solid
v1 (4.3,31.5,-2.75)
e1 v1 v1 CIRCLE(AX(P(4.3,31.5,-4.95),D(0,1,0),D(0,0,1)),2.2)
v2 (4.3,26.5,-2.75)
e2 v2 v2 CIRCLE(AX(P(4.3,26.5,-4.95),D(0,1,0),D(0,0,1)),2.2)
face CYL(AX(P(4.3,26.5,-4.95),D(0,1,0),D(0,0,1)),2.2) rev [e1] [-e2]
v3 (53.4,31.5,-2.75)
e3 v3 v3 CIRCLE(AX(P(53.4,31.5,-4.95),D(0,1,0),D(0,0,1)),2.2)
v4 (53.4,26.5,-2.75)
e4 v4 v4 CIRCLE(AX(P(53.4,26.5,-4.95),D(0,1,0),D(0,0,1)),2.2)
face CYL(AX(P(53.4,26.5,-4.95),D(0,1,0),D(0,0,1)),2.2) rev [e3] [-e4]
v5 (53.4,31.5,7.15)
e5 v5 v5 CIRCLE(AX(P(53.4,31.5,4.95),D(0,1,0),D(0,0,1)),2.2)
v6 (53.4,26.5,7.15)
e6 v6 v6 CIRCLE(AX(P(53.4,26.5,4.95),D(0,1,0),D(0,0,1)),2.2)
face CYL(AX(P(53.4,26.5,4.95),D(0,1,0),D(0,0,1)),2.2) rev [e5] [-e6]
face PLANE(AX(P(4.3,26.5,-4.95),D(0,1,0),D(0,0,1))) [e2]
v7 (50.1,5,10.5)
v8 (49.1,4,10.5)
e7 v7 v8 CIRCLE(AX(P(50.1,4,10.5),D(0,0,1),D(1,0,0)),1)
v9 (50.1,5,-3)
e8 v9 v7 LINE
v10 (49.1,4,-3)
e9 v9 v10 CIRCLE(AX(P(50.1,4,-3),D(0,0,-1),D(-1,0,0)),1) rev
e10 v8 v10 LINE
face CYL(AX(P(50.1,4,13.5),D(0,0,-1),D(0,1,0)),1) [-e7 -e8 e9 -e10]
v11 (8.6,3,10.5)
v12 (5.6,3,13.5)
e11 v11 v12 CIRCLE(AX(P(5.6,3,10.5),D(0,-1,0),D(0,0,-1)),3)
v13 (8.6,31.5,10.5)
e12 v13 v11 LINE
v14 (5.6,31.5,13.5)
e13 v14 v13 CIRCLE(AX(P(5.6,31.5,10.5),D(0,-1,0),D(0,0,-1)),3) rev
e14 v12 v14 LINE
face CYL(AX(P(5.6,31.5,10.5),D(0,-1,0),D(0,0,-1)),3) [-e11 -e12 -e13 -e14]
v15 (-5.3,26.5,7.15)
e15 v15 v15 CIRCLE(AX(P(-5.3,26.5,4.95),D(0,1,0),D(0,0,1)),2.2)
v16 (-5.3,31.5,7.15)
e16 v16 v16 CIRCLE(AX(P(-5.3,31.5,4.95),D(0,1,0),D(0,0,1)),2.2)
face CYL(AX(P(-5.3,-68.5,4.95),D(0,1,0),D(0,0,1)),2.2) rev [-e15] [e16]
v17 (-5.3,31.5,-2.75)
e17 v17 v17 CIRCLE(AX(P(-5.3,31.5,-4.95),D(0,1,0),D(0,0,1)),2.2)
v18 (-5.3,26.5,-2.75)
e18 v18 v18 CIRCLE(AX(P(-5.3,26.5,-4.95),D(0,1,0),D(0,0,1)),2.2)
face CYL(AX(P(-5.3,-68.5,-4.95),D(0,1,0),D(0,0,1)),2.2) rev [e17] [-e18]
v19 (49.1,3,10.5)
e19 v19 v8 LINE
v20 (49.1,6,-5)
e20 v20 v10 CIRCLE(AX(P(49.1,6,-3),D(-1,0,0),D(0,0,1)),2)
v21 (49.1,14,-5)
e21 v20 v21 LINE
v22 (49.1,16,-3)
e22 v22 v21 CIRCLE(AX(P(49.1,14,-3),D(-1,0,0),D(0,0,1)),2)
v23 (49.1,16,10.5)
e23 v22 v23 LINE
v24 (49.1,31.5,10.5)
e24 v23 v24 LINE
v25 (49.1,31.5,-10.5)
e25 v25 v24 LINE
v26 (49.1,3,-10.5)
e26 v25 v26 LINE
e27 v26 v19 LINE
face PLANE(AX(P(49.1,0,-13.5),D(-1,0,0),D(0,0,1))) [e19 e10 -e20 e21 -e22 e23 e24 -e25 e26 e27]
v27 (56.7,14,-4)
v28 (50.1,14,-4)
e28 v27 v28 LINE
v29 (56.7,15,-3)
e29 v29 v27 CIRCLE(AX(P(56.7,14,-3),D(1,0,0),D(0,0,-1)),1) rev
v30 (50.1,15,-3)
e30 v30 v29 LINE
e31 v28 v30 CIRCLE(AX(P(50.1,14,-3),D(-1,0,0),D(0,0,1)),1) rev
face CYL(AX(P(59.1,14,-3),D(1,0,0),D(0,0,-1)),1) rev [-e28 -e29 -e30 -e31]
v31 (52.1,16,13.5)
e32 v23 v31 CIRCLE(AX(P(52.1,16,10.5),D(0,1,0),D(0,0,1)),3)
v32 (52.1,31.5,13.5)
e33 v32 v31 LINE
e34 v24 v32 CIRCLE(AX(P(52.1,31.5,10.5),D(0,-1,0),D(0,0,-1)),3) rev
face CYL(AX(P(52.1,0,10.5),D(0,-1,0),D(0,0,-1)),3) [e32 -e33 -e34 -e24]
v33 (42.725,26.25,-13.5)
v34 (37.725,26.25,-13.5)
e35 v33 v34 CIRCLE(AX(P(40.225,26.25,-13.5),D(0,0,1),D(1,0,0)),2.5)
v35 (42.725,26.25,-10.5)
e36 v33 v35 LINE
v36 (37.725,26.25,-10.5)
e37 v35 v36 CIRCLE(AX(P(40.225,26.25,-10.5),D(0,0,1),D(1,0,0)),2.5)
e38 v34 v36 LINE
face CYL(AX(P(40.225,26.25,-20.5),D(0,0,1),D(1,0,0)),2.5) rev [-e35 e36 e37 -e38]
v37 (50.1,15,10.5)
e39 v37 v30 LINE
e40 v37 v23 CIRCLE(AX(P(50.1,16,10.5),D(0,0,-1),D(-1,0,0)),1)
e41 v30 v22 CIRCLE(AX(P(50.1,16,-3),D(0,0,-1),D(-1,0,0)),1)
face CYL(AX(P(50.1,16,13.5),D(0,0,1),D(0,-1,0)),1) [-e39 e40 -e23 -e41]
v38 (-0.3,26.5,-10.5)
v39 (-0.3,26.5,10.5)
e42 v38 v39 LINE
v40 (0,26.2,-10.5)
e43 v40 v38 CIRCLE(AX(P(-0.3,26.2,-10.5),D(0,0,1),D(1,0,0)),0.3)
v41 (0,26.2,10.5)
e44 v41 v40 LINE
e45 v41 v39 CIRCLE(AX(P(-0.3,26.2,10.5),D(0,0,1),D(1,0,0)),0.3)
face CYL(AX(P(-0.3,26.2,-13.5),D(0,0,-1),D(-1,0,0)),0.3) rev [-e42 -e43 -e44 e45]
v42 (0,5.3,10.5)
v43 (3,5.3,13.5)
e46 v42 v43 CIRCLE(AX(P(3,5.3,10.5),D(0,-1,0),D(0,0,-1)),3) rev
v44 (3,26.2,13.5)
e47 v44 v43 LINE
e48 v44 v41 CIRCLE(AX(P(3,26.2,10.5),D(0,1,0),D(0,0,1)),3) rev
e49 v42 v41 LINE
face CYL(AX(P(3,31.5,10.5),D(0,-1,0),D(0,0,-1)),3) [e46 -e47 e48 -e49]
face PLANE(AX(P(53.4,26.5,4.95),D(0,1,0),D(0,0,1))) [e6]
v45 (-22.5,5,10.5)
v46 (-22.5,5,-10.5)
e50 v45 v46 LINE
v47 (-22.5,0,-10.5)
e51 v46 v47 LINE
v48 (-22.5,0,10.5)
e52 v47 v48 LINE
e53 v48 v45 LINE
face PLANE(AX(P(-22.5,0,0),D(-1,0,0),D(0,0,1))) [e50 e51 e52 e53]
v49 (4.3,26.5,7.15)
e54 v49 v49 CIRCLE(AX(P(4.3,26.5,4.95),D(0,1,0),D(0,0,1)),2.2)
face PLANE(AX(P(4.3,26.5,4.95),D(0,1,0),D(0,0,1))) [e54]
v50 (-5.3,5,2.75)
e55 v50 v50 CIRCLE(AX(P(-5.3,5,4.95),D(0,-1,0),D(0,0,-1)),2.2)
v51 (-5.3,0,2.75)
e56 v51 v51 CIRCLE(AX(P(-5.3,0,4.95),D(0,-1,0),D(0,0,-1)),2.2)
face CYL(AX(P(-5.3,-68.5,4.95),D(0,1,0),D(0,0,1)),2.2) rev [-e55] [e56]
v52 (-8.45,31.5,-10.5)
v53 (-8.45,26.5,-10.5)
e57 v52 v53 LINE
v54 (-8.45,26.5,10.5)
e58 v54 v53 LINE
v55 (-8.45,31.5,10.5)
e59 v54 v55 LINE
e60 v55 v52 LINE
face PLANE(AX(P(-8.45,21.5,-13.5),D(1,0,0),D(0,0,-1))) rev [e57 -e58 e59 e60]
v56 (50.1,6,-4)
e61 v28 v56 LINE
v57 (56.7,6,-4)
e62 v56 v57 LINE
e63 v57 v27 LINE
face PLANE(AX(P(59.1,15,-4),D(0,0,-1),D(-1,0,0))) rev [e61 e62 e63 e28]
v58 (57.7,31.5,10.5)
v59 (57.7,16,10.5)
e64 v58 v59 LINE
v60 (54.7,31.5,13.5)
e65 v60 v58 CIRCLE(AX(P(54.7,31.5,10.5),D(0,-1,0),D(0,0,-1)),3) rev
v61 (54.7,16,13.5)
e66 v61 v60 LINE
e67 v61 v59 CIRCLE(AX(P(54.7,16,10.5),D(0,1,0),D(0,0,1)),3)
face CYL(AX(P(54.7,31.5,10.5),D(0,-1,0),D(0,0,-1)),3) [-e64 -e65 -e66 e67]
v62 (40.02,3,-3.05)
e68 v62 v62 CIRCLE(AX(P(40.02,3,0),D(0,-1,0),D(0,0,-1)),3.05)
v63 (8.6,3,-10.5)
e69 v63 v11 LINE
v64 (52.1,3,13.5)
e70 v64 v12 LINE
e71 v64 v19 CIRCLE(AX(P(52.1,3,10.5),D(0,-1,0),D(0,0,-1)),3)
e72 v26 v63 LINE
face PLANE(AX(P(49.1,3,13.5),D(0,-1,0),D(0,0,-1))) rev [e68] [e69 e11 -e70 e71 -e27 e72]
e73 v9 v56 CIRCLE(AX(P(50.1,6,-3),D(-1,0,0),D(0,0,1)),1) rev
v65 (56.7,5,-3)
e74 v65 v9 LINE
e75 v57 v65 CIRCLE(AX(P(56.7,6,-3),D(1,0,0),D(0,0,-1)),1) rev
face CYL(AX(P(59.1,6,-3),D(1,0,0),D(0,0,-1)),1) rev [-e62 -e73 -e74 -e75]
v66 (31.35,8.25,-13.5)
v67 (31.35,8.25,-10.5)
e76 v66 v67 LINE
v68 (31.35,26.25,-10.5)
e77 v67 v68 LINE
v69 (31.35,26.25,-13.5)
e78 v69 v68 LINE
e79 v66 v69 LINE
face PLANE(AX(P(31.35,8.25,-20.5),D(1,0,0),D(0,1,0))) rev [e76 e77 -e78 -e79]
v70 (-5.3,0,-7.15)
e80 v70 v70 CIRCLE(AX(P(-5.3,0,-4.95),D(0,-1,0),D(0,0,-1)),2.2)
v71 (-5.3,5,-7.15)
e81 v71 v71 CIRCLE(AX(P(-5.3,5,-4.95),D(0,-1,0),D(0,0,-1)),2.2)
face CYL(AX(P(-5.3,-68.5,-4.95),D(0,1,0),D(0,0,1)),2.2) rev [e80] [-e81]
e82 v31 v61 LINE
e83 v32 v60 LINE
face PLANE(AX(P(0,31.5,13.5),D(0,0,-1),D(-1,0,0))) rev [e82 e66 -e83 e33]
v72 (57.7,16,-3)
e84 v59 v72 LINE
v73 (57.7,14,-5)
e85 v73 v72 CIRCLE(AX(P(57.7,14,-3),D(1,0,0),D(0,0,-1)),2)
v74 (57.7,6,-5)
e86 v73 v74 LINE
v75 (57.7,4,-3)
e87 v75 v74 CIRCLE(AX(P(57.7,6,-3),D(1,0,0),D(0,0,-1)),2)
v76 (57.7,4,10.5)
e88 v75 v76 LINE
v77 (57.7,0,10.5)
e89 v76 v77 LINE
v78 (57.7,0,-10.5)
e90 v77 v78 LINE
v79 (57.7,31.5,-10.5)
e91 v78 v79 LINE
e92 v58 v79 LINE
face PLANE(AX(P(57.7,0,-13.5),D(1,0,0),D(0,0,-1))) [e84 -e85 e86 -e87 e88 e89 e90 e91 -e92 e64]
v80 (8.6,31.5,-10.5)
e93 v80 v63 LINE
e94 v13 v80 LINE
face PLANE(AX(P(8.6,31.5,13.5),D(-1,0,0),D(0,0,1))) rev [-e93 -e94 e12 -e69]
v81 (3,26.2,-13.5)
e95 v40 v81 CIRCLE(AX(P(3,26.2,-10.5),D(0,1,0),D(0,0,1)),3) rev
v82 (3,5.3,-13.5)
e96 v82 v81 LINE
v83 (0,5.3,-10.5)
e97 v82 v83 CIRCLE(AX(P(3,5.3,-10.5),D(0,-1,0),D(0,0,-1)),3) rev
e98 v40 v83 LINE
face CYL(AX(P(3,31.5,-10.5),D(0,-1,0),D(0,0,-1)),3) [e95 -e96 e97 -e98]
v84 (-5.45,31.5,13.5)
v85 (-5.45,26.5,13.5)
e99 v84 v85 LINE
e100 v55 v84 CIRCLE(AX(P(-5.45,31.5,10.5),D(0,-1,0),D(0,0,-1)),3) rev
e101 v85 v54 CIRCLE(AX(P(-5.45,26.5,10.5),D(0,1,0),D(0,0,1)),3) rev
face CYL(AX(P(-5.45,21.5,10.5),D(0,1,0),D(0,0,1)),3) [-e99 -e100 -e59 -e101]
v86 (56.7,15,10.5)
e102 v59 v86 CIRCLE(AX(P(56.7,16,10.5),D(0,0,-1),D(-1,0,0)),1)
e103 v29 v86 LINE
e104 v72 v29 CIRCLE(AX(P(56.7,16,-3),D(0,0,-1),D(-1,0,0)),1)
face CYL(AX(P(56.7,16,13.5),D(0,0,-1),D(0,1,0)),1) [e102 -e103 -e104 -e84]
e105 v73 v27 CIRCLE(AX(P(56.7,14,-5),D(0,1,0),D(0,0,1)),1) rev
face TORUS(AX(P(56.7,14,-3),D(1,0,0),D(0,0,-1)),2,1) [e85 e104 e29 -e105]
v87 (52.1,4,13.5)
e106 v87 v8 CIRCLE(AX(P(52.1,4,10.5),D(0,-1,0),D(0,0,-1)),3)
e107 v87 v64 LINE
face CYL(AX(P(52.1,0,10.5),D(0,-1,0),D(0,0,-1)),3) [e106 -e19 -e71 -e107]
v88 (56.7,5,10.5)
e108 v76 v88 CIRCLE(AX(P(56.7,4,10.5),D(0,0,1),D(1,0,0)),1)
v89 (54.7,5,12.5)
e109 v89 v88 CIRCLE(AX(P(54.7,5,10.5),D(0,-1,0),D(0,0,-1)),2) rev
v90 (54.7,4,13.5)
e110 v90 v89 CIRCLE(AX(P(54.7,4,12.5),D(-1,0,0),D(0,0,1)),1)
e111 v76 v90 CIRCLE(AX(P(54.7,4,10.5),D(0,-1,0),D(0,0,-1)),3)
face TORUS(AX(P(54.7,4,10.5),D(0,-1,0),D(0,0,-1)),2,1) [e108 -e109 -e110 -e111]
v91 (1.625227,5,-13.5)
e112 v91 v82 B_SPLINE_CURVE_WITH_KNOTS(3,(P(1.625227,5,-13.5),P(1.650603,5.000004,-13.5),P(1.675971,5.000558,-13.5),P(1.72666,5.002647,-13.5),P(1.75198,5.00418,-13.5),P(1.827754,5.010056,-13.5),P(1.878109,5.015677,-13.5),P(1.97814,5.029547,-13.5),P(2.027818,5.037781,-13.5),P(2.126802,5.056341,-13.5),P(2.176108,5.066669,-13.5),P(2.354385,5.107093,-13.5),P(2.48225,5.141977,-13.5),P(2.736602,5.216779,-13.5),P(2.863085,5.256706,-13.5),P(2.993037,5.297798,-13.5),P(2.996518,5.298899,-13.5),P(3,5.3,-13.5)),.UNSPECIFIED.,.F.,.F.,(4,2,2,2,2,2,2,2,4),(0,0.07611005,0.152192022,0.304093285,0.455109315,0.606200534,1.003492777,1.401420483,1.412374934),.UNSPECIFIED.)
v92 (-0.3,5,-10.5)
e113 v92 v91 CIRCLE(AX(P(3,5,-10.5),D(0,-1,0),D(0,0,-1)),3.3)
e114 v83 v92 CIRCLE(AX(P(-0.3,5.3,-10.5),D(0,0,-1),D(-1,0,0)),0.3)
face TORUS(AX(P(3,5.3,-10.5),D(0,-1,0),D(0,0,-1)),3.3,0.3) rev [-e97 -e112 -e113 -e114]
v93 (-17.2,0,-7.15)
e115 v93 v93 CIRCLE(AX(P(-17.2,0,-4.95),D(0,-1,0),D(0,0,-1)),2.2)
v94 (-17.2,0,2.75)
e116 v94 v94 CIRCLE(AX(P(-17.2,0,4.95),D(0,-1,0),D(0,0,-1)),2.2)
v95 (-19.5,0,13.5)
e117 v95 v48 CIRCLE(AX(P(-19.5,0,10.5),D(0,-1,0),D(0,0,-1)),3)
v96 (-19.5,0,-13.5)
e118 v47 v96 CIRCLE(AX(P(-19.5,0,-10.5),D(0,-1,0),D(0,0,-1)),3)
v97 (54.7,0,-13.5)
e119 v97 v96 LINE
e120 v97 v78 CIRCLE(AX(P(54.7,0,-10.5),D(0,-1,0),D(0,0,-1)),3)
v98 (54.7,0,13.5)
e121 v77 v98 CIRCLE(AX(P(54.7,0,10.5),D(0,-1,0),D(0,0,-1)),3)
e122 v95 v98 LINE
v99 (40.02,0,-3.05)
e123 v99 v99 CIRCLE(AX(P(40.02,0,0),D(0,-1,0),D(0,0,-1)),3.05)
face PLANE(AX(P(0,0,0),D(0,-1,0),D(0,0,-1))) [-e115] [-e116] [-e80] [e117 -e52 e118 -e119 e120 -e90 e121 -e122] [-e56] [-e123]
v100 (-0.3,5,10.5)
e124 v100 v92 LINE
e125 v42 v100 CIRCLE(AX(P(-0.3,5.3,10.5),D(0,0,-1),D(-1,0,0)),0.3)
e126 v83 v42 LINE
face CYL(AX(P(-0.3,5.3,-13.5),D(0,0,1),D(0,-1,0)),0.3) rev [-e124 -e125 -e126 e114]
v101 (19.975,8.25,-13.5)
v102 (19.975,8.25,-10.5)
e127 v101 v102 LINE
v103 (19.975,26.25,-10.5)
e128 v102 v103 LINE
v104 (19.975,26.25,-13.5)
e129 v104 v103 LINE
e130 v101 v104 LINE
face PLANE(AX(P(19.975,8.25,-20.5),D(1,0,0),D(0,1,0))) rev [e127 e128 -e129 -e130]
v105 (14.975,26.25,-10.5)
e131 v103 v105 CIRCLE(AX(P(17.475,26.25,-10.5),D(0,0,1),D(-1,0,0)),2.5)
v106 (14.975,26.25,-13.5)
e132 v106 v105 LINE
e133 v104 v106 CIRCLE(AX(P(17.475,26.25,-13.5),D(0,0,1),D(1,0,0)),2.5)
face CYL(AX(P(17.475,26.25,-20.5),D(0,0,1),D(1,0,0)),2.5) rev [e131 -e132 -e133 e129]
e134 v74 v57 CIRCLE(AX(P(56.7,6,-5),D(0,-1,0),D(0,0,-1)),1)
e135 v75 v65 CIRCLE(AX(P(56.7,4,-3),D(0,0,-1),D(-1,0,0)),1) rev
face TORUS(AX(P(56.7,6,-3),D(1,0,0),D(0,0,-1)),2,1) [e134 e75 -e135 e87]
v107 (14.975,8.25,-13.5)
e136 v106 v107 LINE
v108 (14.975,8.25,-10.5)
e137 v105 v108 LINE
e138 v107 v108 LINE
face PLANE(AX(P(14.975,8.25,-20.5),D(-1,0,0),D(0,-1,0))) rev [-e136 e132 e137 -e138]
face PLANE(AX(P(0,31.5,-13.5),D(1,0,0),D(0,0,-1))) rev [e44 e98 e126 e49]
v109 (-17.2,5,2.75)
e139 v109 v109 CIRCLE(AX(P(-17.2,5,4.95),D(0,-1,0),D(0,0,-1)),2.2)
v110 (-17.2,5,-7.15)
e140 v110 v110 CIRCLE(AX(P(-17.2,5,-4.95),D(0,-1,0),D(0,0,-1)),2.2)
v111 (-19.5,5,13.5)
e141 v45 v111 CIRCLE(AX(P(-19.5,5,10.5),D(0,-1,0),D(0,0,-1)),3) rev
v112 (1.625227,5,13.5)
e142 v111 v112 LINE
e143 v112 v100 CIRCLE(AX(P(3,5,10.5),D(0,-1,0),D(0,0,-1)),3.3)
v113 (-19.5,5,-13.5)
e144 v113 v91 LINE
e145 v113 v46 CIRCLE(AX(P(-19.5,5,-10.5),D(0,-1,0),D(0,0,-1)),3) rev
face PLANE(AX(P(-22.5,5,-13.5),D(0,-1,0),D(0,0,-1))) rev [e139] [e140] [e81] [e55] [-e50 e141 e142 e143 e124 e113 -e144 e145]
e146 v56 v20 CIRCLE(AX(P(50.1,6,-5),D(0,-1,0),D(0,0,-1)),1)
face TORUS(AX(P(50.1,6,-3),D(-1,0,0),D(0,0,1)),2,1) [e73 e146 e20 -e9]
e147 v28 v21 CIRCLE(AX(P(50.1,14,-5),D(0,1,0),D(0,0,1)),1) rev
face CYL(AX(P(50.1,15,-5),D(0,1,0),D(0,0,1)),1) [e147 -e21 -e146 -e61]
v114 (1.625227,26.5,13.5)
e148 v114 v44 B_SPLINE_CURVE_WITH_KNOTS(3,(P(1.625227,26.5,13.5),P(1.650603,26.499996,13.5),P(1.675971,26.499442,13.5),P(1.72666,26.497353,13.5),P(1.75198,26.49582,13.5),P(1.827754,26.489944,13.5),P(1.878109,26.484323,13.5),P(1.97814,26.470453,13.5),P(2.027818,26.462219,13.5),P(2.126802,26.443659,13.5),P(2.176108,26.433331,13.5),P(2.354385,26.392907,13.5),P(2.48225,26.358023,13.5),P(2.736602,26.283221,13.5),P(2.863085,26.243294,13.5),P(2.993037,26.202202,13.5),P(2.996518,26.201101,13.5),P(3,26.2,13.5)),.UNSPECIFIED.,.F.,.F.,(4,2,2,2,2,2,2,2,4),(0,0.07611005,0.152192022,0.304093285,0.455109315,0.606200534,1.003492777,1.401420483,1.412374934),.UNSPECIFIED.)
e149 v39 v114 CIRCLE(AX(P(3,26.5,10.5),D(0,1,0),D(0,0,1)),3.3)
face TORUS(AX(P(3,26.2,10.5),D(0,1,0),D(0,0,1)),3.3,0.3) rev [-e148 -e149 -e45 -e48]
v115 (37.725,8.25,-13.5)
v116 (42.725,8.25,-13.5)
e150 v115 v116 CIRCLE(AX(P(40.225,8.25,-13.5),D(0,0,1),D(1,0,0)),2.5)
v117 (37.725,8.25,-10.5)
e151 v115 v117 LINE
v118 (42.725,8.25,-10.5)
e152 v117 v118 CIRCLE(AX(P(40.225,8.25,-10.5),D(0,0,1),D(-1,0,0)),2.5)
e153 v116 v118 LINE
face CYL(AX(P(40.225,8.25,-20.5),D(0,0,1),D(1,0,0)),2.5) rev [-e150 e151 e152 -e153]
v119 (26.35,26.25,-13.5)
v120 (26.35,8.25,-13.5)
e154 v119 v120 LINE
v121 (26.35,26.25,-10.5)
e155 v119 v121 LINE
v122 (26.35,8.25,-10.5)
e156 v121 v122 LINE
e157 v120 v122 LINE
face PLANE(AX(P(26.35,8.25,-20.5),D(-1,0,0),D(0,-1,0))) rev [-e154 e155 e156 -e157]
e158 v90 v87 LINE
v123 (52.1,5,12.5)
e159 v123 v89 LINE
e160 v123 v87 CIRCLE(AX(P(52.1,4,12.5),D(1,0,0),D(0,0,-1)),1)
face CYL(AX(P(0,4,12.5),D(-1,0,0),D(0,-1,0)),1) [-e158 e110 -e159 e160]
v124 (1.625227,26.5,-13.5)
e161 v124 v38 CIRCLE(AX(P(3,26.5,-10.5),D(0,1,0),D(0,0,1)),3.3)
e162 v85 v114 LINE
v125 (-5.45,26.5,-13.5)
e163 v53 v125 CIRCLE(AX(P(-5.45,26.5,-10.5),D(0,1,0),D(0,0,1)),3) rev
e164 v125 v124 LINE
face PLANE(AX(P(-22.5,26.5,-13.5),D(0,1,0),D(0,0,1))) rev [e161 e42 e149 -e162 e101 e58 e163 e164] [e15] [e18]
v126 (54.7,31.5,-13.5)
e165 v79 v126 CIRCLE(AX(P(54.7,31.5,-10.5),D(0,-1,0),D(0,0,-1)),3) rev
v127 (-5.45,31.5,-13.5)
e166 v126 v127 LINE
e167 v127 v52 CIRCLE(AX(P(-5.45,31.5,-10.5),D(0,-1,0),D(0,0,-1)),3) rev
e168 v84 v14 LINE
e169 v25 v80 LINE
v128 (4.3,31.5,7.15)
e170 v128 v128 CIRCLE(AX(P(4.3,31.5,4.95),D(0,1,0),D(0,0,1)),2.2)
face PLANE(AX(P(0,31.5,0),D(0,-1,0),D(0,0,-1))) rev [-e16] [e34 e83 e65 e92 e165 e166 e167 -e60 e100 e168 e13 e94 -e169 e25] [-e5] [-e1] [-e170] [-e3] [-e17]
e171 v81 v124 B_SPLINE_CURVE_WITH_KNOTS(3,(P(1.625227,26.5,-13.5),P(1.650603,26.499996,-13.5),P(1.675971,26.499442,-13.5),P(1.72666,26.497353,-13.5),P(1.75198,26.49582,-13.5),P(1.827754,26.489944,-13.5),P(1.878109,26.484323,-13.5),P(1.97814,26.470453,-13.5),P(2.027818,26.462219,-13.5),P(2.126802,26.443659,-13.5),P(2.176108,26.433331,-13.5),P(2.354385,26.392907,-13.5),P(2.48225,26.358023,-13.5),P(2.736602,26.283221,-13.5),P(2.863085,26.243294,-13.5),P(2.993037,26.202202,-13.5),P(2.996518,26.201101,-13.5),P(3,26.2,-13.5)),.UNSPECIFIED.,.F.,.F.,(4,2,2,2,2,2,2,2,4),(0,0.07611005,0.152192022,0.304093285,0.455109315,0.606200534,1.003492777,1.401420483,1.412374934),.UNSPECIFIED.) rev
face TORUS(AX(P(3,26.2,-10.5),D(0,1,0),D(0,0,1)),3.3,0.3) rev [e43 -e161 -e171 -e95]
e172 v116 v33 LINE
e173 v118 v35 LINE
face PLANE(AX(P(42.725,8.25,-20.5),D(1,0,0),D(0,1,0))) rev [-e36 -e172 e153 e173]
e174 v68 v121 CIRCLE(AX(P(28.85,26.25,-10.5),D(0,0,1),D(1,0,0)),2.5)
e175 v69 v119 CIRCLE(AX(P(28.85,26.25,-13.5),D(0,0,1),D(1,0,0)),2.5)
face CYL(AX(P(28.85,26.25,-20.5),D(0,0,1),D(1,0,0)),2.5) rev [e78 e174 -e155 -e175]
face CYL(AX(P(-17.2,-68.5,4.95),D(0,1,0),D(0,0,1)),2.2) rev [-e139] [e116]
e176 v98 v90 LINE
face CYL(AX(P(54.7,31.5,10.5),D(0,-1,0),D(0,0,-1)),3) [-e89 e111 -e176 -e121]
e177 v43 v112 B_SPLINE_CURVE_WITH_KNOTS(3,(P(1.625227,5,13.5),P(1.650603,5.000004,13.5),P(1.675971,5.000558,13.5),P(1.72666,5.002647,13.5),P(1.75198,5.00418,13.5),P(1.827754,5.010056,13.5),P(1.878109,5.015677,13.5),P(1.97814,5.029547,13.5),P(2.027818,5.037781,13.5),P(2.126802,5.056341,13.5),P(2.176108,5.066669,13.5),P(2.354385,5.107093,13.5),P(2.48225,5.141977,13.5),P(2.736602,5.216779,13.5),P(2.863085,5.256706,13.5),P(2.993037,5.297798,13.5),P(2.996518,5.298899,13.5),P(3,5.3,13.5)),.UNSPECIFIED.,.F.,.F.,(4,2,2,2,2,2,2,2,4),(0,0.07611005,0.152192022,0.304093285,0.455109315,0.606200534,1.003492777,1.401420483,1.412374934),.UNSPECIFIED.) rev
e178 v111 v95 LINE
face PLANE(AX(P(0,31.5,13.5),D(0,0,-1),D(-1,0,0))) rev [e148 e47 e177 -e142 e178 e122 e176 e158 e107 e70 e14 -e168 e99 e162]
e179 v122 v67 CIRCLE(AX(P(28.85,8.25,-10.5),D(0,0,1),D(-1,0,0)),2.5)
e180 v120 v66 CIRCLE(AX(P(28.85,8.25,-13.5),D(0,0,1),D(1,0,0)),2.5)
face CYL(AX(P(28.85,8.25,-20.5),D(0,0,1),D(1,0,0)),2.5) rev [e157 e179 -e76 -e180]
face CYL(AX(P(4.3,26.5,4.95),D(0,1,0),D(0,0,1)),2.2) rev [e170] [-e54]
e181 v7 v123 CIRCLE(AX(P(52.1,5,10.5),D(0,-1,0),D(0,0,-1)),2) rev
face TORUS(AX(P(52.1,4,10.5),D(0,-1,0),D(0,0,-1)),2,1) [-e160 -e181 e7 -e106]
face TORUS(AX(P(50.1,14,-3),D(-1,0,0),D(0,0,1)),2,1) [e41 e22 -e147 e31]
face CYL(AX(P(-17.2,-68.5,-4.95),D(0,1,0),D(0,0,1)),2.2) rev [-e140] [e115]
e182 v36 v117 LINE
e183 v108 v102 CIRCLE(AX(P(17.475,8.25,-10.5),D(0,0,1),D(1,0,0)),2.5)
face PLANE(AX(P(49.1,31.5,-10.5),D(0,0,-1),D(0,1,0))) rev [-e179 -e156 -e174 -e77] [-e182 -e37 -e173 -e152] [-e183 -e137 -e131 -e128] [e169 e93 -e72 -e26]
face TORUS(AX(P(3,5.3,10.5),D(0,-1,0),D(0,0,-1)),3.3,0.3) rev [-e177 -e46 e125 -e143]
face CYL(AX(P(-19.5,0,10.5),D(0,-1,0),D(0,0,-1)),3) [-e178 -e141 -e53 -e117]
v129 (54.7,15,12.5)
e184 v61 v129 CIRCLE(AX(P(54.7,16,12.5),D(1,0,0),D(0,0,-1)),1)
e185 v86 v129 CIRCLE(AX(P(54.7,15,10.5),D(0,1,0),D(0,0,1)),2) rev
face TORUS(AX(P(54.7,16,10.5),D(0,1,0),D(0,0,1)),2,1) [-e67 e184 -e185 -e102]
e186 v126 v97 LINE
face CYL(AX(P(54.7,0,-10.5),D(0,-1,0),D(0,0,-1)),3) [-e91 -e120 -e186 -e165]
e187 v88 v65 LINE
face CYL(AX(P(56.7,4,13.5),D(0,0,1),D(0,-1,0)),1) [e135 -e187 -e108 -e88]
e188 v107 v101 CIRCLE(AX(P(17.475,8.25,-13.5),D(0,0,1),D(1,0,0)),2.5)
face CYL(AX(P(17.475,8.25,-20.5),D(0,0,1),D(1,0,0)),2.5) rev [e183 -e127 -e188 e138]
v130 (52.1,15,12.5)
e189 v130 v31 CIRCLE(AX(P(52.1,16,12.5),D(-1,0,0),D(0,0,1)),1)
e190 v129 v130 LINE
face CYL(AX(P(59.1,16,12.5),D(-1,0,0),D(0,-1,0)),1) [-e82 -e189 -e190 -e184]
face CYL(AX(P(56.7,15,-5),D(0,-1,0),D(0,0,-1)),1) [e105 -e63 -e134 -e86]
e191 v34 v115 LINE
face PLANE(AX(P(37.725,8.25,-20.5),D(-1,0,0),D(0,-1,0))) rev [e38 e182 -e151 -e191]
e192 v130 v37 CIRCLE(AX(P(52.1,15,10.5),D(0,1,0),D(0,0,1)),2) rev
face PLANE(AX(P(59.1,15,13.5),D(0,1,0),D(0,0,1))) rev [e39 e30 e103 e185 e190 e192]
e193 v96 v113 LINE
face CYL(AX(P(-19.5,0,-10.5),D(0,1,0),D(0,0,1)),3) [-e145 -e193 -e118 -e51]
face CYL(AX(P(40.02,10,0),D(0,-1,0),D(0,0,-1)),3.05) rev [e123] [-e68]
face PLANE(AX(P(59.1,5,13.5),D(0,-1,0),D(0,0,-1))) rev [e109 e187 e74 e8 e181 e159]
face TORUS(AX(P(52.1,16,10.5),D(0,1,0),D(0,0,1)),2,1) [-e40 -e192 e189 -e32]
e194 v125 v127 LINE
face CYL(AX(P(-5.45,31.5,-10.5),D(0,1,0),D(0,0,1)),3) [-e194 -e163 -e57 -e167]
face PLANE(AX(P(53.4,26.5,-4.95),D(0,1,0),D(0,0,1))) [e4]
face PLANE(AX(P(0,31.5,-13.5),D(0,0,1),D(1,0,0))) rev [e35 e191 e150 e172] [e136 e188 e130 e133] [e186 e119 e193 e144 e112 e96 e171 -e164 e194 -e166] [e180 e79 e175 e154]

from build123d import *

# Parameters (mm, degrees)
SKETCH1_W           = 8.6
SKETCH1_H           = 27
BOSS_EXTRUDE1_DEPTH = 31.5
SKETCH2_W           = 27
SKETCH2_H           = 3
BOSS_EXTRUDE2_DEPTH = 40.5
SKETCH3_W           = 3
SKETCH3_H           = 28.5
BOSS_EXTRUDE3_DEPTH = 40.5
SKETCH4_W           = 8.6
SKETCH4_H           = 27
BOSS_EXTRUDE4_DEPTH = 31.5
CUT_EXTRUDE8_DEPTH  = 10
FILLET1_R           = 3
SKETCH5_R           = 2.2
CUT_EXTRUDE1_DEPTH  = 5
SKETCH6_W           = 17.5
SKETCH6_H           = 10
CUT_EXTRUDE2_DEPTH  = 10
FILLET3_R           = 1
SKETCH9_W           = 27
SKETCH9_H           = 5
BOSS_EXTRUDE5_DEPTH = 22.5
SKETCH10_R          = 2.2
CUT_EXTRUDE5_DEPTH  = 100
FILLET4_R           = 3
FILLET5_R           = 0.3
SKETCH12_W          = 14.05
SKETCH12_H          = 27
CUT_EXTRUDE6_DEPTH  = 10
FILLET6_R           = 3
SKETCH13_R          = 3.05
CUT_EXTRUDE7_DEPTH  = 10


with BuildPart() as part:
    # Sketch1 → Boss-Extrude1 (new body)
    with BuildSketch(Plane(origin=(0, 0, 0), x_dir=(1, 0, 0), z_dir=(0, 1, 0))):
        with Locations((4.3, 0)):
            Rectangle(SKETCH1_W, SKETCH1_H)
    extrude(amount=BOSS_EXTRUDE1_DEPTH)

    # Sketch2 → Boss-Extrude2 (add)
    with BuildSketch(Plane(origin=(8.6, 0, 0), x_dir=(0, 0, -1), z_dir=(1, 0, 0))):
        with Locations((0, 1.5)):
            Rectangle(SKETCH2_W, SKETCH2_H)
    extrude(amount=BOSS_EXTRUDE2_DEPTH)

    # Sketch3 → Boss-Extrude3 (add)
    with BuildSketch(Plane(origin=(8.6, 0, 0), x_dir=(0, 0, -1), z_dir=(1, 0, 0))):
        with Locations((12, 17.25)):
            Rectangle(SKETCH3_W, SKETCH3_H)
    extrude(amount=BOSS_EXTRUDE3_DEPTH)

    # Sketch4 → Boss-Extrude4 (add)
    with BuildSketch(Plane(origin=(0, 31.5, 0), x_dir=(1, 0, 0), z_dir=(0, 1, 0))):
        with Locations((53.4, 0)):
            Rectangle(SKETCH4_W, SKETCH4_H)
    extrude(amount=-BOSS_EXTRUDE4_DEPTH)

    # Sketch15 → Cut-Extrude8 (cut)
    with BuildSketch(Plane.XY.offset(-10.5)):
        with BuildLine():
            Line((31.35, 8.25), (31.35, 26.25))
            ThreePointArc((31.35, 26.25), (28.85, 28.75), (26.35, 26.25))
            Line((26.35, 26.25), (26.35, 8.25))
            ThreePointArc((26.35, 8.25), (28.85, 5.75), (31.35, 8.25))
        make_face()
        with BuildLine():
            Line((42.725, 8.25), (42.725, 26.25))
            ThreePointArc((42.725, 26.25), (40.225, 28.75), (37.725, 26.25))
            Line((37.725, 26.25), (37.725, 8.25))
            ThreePointArc((37.725, 8.25), (40.225, 5.75), (42.725, 8.25))
        make_face()
        with BuildLine():
            Line((19.975, 8.25), (19.975, 26.25))
            ThreePointArc((19.975, 26.25), (17.475, 28.75), (14.975, 26.25))
            Line((14.975, 26.25), (14.975, 8.25))
            ThreePointArc((14.975, 8.25), (17.475, 5.75), (19.975, 8.25))
        make_face()
    extrude(amount=-CUT_EXTRUDE8_DEPTH, mode=Mode.SUBTRACT)

    # Fillet1
    fillet1_edges = [part.edges().sort_by_distance(p)[0] for p in [
        (57.7, 15.75, -13.5),
        (57.7, 15.75, 13.5),
        (49.1, 17.25, 13.5),
        (8.6, 17.25, 13.5),
    ]]
    fillet(fillet1_edges, radius=FILLET1_R)

    # Sketch5 → Cut-Extrude1 (cut)
    with BuildSketch(Plane(origin=(0, 31.5, 0), x_dir=(1, 0, 0), z_dir=(0, 1, 0))):
        with Locations(Location((53.4, 4.95, 0), (0, 0, 270))):
            Circle(SKETCH5_R)
        with Locations(Location((53.4, -4.95, 0), (0, 0, 270))):
            Circle(SKETCH5_R)
        with Locations(Location((4.3, 4.95, 0), (0, 0, 270))):
            Circle(SKETCH5_R)
        with Locations(Location((4.3, -4.95, 0), (0, 0, 270))):
            Circle(SKETCH5_R)
    extrude(amount=-CUT_EXTRUDE1_DEPTH, mode=Mode.SUBTRACT)

    # Sketch6 → Cut-Extrude2 (cut)
    with BuildSketch(Plane.ZY.offset(-49.1)):
        with Locations((4.75, 10)):
            Rectangle(SKETCH6_W, SKETCH6_H)
    extrude(amount=-CUT_EXTRUDE2_DEPTH, mode=Mode.SUBTRACT)

    # Fillet3
    fillet3_edges = [part.edges().sort_by_distance(p)[0] for p in [
        (56.821320344, 5, 12.621320344),
        (56.821320344, 15, 12.621320344),
        (57.7, 10, -4),
        (49.1, 5, 3.25),
        (49.1, 15, 3.25),
        (49.1, 10, -4),
        (49.978679656, 15, 12.621320344),
        (57.7, 15, 3.25),
        (53.4, 15, 13.5),
        (49.978679656, 5, 12.621320344),
        (57.7, 5, 3.25),
        (53.4, 15, -4),
        (53.4, 5, 13.5),
        (53.4, 5, -4),
    ]]
    fillet(fillet3_edges, radius=FILLET3_R)

    # Sketch9 → Boss-Extrude5 (add)
    with BuildSketch(Plane.ZY):
        with Locations((0, 29)):
            Rectangle(SKETCH9_W, SKETCH9_H)
        with Locations((0, 2.5)):
            Rectangle(SKETCH9_W, SKETCH9_H)
    extrude(amount=BOSS_EXTRUDE5_DEPTH)

    # Sketch10 → Cut-Extrude5 (cut)
    with BuildSketch(Plane(origin=(0, 31.5, 0), x_dir=(1, 0, 0), z_dir=(0, 1, 0))):
        with Locations(Location((-5.3, 4.95, 0), (0, 0, 90))):
            Circle(SKETCH10_R)
        with Locations(Location((-5.3, -4.95, 0), (0, 0, 90))):
            Circle(SKETCH10_R)
        with Locations(Location((-17.2, -4.95, 0), (0, 0, 90))):
            Circle(SKETCH10_R)
        with Locations(Location((-17.2, 4.95, 0), (0, 0, 90))):
            Circle(SKETCH10_R)
    extrude(amount=-CUT_EXTRUDE5_DEPTH, mode=Mode.SUBTRACT)

    # Fillet4
    fillet4_edges = [part.edges().sort_by_distance(p)[0] for p in [
        (0, 15.75, 13.5),
        (0, 15.75, -13.5),
        (-22.5, 2.5, 13.5),
        (-22.5, 2.5, -13.5),
    ]]
    fillet(fillet4_edges, radius=FILLET4_R)

    # Fillet5
    # the kernel refuses this fillet: 0.3 mm, written as the material it adds along each edge
    with BuildSketch(Plane(origin=(0, 5, 10.5), x_dir=(0, 1, 0), z_dir=(0, 0, -1))) as fillet5_piece_1:
        with BuildLine():
            CenterArc((FILLET5_R, -FILLET5_R), FILLET5_R, 90, 90)
            Line((0, -FILLET5_R), (0, 0))
            Line((0, 0), (FILLET5_R, 0))
        make_face()
    extrude(amount=21)
    with BuildSketch(Plane(origin=(0, 26.5, 10.5), x_dir=(0, -1, 0), z_dir=(0, 0, -1))) as fillet5_piece_2:
        with BuildLine():
            CenterArc((FILLET5_R, FILLET5_R), FILLET5_R, 180, 90)
            Line((0, FILLET5_R), (0, 0))
            Line((0, 0), (FILLET5_R, 0))
        make_face()
    extrude(amount=21)
    with BuildSketch(Plane(origin=(3, 5, -10.5), x_dir=(-1, 0, 0), z_dir=(0, 0, 1))) as fillet5_piece_3_section:
        with BuildLine():
            CenterArc((3 + FILLET5_R, -FILLET5_R), FILLET5_R, 90, 90)
            Line((3 + FILLET5_R, 0), (3, 0))
            Line((3, 0), (3, -FILLET5_R))
        make_face()
    fillet5_piece_3 = revolve(axis=Axis((3, 5, -10.5), (0, -1, 0)), revolution_arc=104.329698924, mode=Mode.PRIVATE)
    fillet5_piece_3 = split(fillet5_piece_3, bisect_by=Plane(origin=(0.81861369, 5.084946104, -13.5), z_dir=(0, 0, 1)), keep=Keep.TOP, mode=Mode.PRIVATE)
    add(fillet5_piece_3)
    with BuildSketch(Plane(origin=(3, 26.5, -10.5), x_dir=(-1, 0, 0), z_dir=(0, 0, 1))) as fillet5_piece_4_section:
        with BuildLine():
            CenterArc((3 + FILLET5_R, FILLET5_R), FILLET5_R, 180, 90)
            Line((3 + FILLET5_R, 0), (3, 0))
            Line((3, 0), (3, FILLET5_R))
        make_face()
    fillet5_piece_4 = revolve(axis=Axis((3, 26.5, -10.5), (0, -1, 0)), revolution_arc=104.329698924, mode=Mode.PRIVATE)
    fillet5_piece_4 = split(fillet5_piece_4, bisect_by=Plane(origin=(0.81861369, 26.415053896, -13.5), z_dir=(0, 0, 1)), keep=Keep.TOP, mode=Mode.PRIVATE)
    add(fillet5_piece_4)
    with BuildSketch(Plane(origin=(3, 5, 10.5), x_dir=(0.24750126301206385, 0, 0.968887570777659), z_dir=(0.968887570777659, 0, -0.24750126301206385))) as fillet5_piece_5_section:
        with BuildLine():
            CenterArc((3 + FILLET5_R, -FILLET5_R), FILLET5_R, 90, 90)
            Line((3 + FILLET5_R, 0), (3, 0))
            Line((3, 0), (3, -FILLET5_R))
        make_face()
    fillet5_piece_5 = revolve(axis=Axis((3, 5, 10.5), (0, -1, 0)), revolution_arc=104.329698924, mode=Mode.PRIVATE)
    fillet5_piece_5 = split(fillet5_piece_5, bisect_by=Plane(origin=(0.818613701, 5.084946089, 13.5), z_dir=(0, 0, -1)), keep=Keep.TOP, mode=Mode.PRIVATE)
    add(fillet5_piece_5)
    with BuildSketch(Plane(origin=(3, 26.5, 10.5), x_dir=(0.24750126301206454, 0, 0.9688875707776589), z_dir=(0.9688875707776589, 0, -0.24750126301206454))) as fillet5_piece_6_section:
        with BuildLine():
            CenterArc((3 + FILLET5_R, FILLET5_R), FILLET5_R, 180, 90)
            Line((3, FILLET5_R), (3, 0))
            Line((3, 0), (3 + FILLET5_R, 0))
        make_face()
    fillet5_piece_6 = revolve(axis=Axis((3, 26.5, 10.5), (0, -1, 0)), revolution_arc=104.329698924, mode=Mode.PRIVATE)
    fillet5_piece_6 = split(fillet5_piece_6, bisect_by=Plane(origin=(0.818613746, 26.41505391, 13.5), z_dir=(0, 0, -1)), keep=Keep.TOP, mode=Mode.PRIVATE)
    add(fillet5_piece_6)

    # Sketch12 → Cut-Extrude6 (cut)
    with BuildSketch(Plane(origin=(0, 31.5, 0), x_dir=(1, 0, 0), z_dir=(0, 1, 0))):
        with Locations((-15.475, 0)):
            Rectangle(SKETCH12_W, SKETCH12_H)
    extrude(amount=-CUT_EXTRUDE6_DEPTH, mode=Mode.SUBTRACT)

    # Fillet6
    fillet6_edges = [part.edges().sort_by_distance(p)[0] for p in [
        (-8.45, 29, -13.5),
        (-8.45, 29, 13.5),
    ]]
    fillet(fillet6_edges, radius=FILLET6_R)

    # Sketch13 → Cut-Extrude7 (cut)
    with BuildSketch(Plane.XZ):
        with Locations(Location((40.02, 0, 0), (0, 0, 270))):
            Circle(SKETCH13_R)
    extrude(amount=-CUT_EXTRUDE7_DEPTH, mode=Mode.SUBTRACT)


solid = part.part
